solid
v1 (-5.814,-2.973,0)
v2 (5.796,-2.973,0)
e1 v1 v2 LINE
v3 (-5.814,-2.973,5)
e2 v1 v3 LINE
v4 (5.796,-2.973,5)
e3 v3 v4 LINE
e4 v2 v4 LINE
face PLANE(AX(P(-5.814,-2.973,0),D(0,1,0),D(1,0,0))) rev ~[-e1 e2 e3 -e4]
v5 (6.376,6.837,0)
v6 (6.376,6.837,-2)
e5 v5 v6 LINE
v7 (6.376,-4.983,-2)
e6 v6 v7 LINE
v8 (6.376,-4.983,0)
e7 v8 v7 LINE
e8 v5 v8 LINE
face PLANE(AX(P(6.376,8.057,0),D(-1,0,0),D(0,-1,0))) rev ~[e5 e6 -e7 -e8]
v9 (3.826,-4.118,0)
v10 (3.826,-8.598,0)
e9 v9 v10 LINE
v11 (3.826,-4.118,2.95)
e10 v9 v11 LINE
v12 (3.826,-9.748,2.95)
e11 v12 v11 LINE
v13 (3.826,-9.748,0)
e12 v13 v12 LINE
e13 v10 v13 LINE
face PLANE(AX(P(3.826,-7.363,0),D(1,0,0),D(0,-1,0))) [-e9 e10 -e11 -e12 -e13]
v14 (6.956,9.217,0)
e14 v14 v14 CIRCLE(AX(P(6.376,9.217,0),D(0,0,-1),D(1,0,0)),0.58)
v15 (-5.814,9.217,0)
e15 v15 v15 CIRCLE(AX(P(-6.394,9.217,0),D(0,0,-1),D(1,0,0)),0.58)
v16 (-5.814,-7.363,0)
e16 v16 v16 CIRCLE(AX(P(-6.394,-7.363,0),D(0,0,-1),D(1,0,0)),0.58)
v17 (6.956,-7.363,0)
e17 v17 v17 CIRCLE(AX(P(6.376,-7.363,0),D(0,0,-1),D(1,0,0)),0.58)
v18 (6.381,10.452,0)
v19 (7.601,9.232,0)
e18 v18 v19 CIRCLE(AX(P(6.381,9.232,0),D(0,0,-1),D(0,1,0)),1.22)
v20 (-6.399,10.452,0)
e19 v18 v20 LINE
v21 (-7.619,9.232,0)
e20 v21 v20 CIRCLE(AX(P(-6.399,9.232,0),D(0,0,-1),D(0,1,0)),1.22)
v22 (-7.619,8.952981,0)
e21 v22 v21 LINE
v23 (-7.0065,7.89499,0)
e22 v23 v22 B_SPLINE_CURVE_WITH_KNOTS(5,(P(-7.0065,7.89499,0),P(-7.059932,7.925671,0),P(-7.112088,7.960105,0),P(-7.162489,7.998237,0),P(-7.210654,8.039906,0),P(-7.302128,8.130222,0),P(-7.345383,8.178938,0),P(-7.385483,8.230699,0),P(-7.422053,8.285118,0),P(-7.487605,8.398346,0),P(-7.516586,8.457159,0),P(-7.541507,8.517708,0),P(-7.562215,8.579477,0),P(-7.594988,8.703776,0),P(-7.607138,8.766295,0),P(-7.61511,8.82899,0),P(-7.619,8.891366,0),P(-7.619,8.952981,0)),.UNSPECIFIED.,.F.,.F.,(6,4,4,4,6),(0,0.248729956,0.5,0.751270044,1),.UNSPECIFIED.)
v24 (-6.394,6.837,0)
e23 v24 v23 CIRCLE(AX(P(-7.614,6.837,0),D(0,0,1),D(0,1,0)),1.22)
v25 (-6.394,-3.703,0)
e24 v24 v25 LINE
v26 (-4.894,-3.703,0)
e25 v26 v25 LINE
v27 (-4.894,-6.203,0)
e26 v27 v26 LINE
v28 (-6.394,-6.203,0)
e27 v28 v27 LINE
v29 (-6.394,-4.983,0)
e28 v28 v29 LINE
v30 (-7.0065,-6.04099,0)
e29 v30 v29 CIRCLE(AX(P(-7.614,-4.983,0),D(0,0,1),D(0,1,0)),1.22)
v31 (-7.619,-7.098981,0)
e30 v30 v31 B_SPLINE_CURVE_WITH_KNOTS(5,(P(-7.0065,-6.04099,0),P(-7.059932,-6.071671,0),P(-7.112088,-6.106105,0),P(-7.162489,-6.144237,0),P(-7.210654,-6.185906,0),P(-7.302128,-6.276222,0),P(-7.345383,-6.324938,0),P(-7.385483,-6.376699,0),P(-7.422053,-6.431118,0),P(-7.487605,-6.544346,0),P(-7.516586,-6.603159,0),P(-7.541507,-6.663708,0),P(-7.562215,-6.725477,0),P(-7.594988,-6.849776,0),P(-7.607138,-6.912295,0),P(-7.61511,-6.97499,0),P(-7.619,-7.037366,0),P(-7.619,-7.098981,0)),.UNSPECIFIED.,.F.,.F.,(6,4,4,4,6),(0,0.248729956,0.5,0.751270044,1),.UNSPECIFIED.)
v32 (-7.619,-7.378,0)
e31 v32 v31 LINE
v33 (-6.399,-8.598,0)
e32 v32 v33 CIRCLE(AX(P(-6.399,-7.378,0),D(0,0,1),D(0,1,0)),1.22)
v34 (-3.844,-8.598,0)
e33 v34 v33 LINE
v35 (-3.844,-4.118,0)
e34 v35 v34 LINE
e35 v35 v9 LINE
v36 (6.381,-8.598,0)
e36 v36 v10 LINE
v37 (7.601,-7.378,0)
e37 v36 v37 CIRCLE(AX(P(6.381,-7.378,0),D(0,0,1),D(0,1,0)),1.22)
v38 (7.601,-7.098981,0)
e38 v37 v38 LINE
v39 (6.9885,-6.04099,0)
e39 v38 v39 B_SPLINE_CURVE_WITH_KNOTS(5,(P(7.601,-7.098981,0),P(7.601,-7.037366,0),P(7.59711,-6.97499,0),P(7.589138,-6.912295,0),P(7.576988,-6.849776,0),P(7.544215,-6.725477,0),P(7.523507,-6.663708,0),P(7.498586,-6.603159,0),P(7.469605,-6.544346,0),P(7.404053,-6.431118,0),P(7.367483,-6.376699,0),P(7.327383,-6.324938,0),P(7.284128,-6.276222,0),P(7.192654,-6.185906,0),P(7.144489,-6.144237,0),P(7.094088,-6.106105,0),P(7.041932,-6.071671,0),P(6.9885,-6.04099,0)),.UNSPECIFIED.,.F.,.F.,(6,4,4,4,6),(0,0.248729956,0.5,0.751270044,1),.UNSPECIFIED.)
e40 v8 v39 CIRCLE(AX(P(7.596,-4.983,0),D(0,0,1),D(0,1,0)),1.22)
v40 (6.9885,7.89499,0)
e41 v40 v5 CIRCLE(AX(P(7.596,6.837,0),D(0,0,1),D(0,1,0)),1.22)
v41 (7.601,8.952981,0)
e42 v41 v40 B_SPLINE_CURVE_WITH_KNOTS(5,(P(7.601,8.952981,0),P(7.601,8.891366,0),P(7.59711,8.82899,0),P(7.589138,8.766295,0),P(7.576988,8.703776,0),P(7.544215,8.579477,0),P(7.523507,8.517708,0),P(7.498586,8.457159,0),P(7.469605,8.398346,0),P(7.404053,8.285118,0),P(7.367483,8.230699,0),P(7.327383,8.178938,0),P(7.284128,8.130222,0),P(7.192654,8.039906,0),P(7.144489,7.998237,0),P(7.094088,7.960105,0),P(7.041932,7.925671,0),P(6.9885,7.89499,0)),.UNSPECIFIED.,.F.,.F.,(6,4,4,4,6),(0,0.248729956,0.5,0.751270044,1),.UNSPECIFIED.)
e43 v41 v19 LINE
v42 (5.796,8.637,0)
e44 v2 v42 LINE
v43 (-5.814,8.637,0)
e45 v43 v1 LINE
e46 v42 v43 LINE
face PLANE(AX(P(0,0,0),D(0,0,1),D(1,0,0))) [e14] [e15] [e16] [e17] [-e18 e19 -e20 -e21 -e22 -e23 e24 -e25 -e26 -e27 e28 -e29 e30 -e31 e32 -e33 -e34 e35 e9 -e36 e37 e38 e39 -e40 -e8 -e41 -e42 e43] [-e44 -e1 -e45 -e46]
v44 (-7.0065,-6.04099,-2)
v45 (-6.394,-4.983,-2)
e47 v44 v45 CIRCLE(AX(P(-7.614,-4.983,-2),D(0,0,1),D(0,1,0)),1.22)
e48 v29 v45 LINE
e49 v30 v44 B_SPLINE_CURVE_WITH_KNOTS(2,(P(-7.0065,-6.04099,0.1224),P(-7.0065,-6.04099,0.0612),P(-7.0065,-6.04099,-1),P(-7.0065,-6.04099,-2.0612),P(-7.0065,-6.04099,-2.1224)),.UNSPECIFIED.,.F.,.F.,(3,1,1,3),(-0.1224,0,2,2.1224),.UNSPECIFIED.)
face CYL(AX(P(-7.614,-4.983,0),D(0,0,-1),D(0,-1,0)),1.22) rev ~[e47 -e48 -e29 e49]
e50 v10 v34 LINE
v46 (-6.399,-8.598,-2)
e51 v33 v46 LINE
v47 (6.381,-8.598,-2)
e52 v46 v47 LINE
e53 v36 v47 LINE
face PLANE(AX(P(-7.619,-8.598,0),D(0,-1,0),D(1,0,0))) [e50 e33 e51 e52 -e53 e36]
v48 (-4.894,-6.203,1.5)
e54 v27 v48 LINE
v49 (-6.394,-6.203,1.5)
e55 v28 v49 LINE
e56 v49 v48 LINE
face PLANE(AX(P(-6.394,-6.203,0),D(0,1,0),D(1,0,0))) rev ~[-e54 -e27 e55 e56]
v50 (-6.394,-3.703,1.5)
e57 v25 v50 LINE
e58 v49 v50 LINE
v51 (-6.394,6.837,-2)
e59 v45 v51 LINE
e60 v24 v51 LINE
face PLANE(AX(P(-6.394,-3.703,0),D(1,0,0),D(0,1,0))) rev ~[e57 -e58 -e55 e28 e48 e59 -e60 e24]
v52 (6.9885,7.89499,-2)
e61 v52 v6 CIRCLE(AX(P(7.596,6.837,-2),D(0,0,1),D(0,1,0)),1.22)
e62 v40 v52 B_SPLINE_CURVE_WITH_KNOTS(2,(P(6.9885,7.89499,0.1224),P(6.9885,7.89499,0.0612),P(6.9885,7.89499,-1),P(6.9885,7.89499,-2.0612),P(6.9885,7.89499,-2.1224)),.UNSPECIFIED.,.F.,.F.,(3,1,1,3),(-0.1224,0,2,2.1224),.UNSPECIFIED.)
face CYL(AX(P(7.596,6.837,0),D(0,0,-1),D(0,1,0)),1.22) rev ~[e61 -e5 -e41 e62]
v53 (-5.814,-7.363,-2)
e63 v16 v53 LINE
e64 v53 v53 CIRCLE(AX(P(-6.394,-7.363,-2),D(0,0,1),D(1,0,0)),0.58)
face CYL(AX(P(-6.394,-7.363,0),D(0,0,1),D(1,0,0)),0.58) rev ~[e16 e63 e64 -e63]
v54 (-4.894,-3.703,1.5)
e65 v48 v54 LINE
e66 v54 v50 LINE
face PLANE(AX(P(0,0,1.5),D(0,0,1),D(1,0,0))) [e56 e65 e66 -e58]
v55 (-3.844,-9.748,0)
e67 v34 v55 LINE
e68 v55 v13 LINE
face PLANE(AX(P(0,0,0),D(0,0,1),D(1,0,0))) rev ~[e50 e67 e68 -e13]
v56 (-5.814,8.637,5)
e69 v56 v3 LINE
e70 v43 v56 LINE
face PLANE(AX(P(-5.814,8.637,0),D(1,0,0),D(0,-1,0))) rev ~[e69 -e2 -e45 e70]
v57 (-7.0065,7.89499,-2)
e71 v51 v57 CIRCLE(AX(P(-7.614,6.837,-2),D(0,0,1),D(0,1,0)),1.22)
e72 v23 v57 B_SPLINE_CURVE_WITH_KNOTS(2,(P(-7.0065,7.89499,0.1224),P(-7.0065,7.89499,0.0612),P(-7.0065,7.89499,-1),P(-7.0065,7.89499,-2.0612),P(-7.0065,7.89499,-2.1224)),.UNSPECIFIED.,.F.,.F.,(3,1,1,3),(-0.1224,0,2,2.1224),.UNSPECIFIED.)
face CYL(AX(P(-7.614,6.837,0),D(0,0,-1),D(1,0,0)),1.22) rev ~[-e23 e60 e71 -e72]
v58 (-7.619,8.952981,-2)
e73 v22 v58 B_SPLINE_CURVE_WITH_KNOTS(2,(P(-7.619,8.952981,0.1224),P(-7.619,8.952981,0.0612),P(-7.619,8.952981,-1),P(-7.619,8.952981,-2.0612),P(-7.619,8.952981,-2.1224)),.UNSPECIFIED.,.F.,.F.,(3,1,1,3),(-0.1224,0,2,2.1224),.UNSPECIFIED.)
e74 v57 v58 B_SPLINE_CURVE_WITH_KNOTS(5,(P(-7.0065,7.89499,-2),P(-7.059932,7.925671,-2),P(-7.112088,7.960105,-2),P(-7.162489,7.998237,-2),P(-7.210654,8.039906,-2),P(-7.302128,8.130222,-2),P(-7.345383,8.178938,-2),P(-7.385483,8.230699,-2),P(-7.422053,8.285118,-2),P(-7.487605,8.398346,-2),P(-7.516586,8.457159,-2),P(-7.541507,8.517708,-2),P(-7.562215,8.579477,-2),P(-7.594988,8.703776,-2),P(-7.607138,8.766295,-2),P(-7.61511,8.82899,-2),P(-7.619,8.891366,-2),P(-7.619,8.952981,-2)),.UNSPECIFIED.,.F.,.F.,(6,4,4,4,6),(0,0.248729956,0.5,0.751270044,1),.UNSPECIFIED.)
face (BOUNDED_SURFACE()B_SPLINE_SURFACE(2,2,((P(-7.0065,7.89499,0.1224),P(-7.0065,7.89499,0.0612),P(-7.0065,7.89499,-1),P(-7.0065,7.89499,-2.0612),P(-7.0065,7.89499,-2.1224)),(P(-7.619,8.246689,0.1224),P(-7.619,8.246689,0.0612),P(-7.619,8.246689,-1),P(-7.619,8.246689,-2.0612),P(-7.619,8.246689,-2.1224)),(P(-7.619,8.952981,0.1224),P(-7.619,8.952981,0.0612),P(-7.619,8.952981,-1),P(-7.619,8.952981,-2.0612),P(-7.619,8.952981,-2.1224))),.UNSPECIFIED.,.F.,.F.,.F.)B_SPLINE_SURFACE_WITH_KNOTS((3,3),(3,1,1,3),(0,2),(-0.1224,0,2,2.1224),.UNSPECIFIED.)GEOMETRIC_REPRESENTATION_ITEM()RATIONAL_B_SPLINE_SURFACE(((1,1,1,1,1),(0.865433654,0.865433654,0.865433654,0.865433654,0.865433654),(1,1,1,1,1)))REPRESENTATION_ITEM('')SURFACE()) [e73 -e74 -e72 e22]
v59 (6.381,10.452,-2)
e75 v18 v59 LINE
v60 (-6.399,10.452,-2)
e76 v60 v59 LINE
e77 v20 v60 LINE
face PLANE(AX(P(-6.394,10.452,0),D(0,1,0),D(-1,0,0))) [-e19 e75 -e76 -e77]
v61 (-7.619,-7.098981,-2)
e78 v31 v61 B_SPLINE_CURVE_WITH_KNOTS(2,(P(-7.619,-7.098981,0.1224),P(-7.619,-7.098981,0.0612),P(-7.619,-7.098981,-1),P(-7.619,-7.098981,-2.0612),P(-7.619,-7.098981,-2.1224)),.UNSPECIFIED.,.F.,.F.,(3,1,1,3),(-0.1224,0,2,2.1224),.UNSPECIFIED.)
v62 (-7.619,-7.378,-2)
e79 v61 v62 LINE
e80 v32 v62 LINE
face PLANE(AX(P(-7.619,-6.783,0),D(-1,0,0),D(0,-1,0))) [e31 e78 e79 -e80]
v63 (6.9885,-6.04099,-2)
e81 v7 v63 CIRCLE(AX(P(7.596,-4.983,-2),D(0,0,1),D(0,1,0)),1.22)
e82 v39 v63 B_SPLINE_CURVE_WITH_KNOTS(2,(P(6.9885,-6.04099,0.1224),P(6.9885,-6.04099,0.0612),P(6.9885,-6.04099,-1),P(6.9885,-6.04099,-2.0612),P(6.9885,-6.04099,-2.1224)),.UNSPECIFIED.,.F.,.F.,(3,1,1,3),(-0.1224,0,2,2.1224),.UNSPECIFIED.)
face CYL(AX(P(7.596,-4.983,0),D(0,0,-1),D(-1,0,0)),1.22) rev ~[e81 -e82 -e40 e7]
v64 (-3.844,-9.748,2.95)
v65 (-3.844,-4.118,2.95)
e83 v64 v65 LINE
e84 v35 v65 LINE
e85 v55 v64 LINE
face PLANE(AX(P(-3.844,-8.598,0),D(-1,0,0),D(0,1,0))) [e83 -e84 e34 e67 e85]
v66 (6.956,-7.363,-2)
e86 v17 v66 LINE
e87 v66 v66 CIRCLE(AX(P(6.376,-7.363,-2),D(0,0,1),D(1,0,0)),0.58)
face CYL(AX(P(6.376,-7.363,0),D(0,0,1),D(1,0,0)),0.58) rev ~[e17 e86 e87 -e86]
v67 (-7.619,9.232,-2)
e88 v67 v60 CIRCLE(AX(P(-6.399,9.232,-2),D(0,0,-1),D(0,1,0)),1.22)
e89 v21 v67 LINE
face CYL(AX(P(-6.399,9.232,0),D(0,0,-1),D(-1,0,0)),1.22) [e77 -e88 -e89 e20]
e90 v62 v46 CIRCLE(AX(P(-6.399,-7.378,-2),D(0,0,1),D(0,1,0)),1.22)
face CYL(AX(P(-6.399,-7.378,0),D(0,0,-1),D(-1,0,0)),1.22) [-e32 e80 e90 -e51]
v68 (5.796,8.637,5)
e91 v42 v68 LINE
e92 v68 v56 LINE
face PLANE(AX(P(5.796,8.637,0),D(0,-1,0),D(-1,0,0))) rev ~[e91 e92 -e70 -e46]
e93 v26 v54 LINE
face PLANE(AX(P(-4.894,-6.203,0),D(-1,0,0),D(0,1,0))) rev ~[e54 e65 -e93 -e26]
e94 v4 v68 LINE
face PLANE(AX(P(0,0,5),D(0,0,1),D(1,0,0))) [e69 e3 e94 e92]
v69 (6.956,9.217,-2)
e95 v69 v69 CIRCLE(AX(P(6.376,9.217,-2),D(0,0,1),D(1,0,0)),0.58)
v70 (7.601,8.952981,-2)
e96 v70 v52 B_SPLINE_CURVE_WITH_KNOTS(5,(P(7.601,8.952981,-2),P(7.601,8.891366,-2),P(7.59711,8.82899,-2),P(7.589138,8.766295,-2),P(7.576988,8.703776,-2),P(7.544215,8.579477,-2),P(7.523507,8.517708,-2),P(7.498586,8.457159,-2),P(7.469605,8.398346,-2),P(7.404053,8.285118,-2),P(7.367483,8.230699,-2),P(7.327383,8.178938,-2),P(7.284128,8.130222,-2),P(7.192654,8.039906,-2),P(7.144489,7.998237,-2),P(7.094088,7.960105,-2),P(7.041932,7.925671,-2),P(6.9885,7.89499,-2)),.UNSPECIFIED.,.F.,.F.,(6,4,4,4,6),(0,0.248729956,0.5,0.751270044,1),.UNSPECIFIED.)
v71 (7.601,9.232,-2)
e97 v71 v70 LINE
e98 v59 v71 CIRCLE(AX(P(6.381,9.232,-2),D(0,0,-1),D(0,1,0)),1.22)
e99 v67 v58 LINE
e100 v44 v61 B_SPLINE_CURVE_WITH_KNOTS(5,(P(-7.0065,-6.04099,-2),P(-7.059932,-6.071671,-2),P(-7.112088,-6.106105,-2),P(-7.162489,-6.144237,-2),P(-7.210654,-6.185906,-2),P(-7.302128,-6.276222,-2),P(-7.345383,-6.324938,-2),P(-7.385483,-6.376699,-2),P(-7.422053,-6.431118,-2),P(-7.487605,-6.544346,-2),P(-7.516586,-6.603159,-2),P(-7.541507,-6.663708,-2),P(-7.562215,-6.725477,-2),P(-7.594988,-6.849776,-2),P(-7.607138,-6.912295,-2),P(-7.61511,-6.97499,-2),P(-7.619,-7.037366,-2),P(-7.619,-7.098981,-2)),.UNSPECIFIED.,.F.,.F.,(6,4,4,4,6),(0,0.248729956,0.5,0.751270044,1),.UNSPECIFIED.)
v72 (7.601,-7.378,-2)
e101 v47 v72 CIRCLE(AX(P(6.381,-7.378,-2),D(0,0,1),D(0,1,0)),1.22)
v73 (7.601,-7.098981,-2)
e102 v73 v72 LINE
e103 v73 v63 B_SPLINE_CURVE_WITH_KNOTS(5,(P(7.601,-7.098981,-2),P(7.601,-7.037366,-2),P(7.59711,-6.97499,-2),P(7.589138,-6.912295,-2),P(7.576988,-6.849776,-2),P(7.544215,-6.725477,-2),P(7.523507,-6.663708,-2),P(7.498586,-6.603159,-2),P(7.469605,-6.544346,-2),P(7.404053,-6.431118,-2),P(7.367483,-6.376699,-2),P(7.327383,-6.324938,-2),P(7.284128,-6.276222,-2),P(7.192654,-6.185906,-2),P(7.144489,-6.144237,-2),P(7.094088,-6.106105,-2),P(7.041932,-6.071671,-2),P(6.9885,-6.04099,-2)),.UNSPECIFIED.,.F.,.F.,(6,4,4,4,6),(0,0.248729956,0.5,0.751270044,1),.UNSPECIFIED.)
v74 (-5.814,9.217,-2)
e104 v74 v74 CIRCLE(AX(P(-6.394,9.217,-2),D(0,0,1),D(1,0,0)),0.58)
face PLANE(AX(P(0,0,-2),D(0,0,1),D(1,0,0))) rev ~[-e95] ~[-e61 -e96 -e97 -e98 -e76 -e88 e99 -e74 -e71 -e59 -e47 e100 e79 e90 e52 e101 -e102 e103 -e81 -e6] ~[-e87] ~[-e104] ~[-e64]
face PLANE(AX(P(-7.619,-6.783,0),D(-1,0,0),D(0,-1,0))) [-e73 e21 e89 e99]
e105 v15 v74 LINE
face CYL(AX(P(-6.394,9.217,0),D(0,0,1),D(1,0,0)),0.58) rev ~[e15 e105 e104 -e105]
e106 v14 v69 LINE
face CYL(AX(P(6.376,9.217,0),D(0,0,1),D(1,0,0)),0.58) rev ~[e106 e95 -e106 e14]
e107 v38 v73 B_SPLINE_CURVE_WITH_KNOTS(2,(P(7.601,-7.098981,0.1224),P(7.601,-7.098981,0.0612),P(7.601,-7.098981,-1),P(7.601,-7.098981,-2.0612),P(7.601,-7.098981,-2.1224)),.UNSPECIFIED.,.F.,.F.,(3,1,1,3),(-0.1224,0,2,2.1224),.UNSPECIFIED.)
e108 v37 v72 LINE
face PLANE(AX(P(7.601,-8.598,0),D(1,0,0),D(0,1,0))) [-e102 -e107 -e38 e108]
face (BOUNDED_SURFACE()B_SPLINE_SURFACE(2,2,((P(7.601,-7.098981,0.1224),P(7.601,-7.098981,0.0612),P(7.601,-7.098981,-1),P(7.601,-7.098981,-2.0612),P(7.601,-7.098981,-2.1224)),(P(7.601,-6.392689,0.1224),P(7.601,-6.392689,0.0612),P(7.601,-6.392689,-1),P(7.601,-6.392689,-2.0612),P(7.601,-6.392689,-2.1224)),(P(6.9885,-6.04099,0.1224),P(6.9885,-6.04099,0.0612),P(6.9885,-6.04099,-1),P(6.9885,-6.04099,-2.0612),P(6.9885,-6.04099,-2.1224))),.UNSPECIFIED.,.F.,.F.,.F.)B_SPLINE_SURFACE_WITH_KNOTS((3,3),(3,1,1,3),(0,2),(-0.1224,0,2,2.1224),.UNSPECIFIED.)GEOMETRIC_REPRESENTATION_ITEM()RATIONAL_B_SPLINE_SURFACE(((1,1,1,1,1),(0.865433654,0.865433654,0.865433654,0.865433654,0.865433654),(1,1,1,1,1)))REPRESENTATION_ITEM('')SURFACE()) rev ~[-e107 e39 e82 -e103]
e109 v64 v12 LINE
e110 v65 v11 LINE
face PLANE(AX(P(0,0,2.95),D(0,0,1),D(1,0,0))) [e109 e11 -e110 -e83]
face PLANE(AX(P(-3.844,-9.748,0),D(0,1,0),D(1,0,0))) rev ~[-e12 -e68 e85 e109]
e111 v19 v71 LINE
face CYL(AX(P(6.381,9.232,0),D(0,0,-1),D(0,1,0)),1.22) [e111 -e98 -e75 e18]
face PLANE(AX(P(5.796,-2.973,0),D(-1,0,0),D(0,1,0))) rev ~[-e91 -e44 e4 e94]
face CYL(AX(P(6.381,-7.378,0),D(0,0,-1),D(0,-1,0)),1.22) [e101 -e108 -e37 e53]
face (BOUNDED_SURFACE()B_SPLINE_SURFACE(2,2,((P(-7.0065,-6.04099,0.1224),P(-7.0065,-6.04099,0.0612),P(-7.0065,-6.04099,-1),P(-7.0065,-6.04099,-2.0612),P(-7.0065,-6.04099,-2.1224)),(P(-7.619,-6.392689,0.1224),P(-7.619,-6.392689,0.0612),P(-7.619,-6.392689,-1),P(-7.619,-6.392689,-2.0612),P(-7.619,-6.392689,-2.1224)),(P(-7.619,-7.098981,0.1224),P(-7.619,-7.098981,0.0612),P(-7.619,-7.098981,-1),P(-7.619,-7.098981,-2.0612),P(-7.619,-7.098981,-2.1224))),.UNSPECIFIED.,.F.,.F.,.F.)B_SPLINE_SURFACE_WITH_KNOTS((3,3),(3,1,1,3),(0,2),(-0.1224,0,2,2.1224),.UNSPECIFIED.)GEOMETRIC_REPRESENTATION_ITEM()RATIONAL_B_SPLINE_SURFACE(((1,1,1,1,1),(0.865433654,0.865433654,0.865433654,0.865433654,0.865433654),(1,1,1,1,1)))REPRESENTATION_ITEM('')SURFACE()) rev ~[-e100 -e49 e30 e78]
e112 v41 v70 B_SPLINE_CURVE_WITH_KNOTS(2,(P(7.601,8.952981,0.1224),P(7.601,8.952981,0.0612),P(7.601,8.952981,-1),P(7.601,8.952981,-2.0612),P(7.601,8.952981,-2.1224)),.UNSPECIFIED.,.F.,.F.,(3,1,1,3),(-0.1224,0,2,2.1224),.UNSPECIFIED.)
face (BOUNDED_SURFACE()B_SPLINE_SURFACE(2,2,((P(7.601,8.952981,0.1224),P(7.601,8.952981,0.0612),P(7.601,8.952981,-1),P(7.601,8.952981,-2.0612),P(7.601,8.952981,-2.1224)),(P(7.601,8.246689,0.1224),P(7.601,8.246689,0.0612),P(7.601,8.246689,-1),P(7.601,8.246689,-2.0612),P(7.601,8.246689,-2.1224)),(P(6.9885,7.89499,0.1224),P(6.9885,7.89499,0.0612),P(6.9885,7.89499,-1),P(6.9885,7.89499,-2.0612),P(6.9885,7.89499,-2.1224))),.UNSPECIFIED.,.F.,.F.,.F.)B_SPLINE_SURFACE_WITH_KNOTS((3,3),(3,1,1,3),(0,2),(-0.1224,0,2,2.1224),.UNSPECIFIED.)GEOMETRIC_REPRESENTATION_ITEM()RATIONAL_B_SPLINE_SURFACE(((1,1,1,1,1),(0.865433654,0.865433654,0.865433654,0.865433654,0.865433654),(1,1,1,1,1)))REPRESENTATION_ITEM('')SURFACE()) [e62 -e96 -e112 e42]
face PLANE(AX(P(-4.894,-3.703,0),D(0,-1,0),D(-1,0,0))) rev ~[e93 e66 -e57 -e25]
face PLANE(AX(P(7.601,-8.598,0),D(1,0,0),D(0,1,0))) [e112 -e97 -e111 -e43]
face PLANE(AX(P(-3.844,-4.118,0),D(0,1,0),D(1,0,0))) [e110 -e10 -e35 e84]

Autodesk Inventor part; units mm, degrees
ref_plane "YZ Plane" through (0, 0, 0) normal (1, 0, 0) x (0, 1, 0)
ref_plane "XZ Plane" through (0, 0, 0) normal (0, 1, 0) x (-1, 0, 0)
ref_plane "XY Plane" through (0, 0, 0) normal (0, 0, 1) x (1, 0, 0)
sketch "Sketch1" plane through (0, 0, 0) normal (0, 0, 1) x (1, 0, 0)
  line L0 (-7.619, -8.598) -> (7.601, -8.598)
  line L1 (7.601, -8.598) -> (7.601, 10.452)
  line L2 (7.601, 10.452) -> (-7.619, 10.452)
  line L3 (-7.619, 10.452) -> (-7.619, -8.598)
  line L4 (-6.394, 9.217) -> (6.376, 9.217)
  line L5 (6.376, 9.217) -> (6.376, -7.363)
  line L6 (6.376, -7.363) -> (-6.394, -7.363)
  line L7 (-6.394, -7.363) -> (-6.394, 9.217)
  circle A0 centre (-6.394, 9.217) radius 0.58
  circle A1 centre (6.376, 9.217) radius 0.58
  circle A2 centre (6.376, -7.363) radius 0.58
  circle A3 centre (-6.394, -7.363) radius 0.58
  line L8 (-3.844, -9.748) -> (3.826, -9.748)
  line L9 (3.826, -9.748) -> (3.826, -8.598)
  line L10 (-3.844, -9.748) -> (-3.844, -8.598)
  line L11 (5.796, 8.637) -> (-5.814, 8.637)
  line L12 (-5.814, 8.637) -> (-5.814, -2.973)
  line L13 (-5.814, -2.973) -> (5.796, -2.973)
  line L14 (5.796, -2.973) -> (5.796, 8.637)
  line L15 (3.826, -9.748) -> (-3.844, -9.748)
  line L16 (-3.844, -9.748) -> (-3.844, -4.118)
  line L17 (-3.844, -4.118) -> (3.826, -4.118)
  line L18 (3.826, -4.118) -> (3.826, -9.748)
  line L19 (-6.394, -6.203) -> (-4.894, -6.203)
  line L20 (-4.894, -6.203) -> (-4.894, -3.703)
  line L21 (-4.894, -3.703) -> (-6.394, -3.703)
  line L22 (-6.394, -3.703) -> (-6.394, -6.203)
  line L23 (-7.619, 8.057) -> (-6.394, 8.057)
  line L24 (-6.394, 8.057) -> (-6.394, -6.783)
  line L25 (-7.619, -6.783) -> (-7.619, 8.057)
  line L26 (7.601, 8.637) -> (7.601, -6.783)
  line L27 (6.376, -6.783) -> (6.376, 8.637)
  line L28 (-6.394, 10.452) -> (-6.394, 9.797)
  line L29 (6.376, 10.452) -> (6.376, 9.797)
  line L30 (-7.619, -6.203) -> (-6.394, -6.203)
  line L31 (6.376, -6.203) -> (7.601, -6.203)
  line L32 (6.376, 8.057) -> (7.601, 8.057)
  point P0 (0, 0)
  point P1 (2.2173, 6.5337)
  point P2 (-0.009, -8.598)
  point P3 (-0.009, -9.748)
  point P4 (-6.394, -3.703)
  point P5 (-4.894, -4.953)
  point P6 (-5.644, -6.203)
  point P7 (-6.394, 8.057)
  point P8 (-7.0065, -6.783)
  point P9 (6.9885, 8.637)
  point P10 (-7.0065, -6.203)
  dimension "d16" = 1.16
  dimension "d17" = 1.16
  dimension "d0" = 15.22
  dimension "d1" = 19.05
  dimension "d14" = 12.77
  dimension "d15" = 16.58
  dimension "d18" = 1.16
  dimension "d19" = 1.16
  dimension "d23" = 1.235
  dimension "d24" = 1.225
  dimension "d47" = 1.15
  dimension "d55" = 5.63
  dimension "d60" = 1.5
  dimension "d61" = 2.5
  dimension "d64" = 2.395
  dimension "d67" = 2.395
extrude "Extrusion1" add sketch "Sketch1" against normal blind 2 contours L3 L30 L7 A3 L6 L16 L0 | L16 L6 L18 L0 | L18 L6 A2 L5 L31 L1 L0 | L16 L17 L18 L6 | L6 A3 L7 L19 L20 L21 A0 L4 A1 L5 A2 L18 L17 L16 | L3 L23 L7 L30 | L3 L2 L28 A0 L7 L23 | L7 L21 L20 L19 | L31 L5 L32 L1 | L2 L29 A1 L4 A0 L28 | L32 L5 A1 L29 L2 L1 | L14 L13 L12 L11
extrude "Extrusion6" add sketch "Sketch1" along normal blind 5 contours L14 L13 L12 L11
extrude "Extrusion7" add sketch "Sketch1" along normal blind 2.95 contours L16 L6 L18 L0 | L0 L9 L8 L10 | L16 L17 L18 L6
extrude "Extrusion8" add sketch "Sketch1" along normal blind 1.5 contours L7 L21 L20 L19
extrude "Extrusion10" cut sketch "Sketch1" against normal blind 2 contours L3 L23 L7 L30 | L31 L5 L32 L1
fillet "Fillet13" radius 1.22 12 edges at (7.601, 10.452, -1) (7.601, 8.057, -1) (6.376, 8.057, -1) (7.601, -6.203, -1) (6.376, -6.203, -1) (7.601, -8.598, -1) (-6.394, -6.203, -1) (-7.619, -6.203, -1) (-7.619, -8.598, -1) (-7.619, 10.452, -1) (-7.619, 8.057, -1) (-6.394, 8.057, -1)
properties part number "IR_cam"
